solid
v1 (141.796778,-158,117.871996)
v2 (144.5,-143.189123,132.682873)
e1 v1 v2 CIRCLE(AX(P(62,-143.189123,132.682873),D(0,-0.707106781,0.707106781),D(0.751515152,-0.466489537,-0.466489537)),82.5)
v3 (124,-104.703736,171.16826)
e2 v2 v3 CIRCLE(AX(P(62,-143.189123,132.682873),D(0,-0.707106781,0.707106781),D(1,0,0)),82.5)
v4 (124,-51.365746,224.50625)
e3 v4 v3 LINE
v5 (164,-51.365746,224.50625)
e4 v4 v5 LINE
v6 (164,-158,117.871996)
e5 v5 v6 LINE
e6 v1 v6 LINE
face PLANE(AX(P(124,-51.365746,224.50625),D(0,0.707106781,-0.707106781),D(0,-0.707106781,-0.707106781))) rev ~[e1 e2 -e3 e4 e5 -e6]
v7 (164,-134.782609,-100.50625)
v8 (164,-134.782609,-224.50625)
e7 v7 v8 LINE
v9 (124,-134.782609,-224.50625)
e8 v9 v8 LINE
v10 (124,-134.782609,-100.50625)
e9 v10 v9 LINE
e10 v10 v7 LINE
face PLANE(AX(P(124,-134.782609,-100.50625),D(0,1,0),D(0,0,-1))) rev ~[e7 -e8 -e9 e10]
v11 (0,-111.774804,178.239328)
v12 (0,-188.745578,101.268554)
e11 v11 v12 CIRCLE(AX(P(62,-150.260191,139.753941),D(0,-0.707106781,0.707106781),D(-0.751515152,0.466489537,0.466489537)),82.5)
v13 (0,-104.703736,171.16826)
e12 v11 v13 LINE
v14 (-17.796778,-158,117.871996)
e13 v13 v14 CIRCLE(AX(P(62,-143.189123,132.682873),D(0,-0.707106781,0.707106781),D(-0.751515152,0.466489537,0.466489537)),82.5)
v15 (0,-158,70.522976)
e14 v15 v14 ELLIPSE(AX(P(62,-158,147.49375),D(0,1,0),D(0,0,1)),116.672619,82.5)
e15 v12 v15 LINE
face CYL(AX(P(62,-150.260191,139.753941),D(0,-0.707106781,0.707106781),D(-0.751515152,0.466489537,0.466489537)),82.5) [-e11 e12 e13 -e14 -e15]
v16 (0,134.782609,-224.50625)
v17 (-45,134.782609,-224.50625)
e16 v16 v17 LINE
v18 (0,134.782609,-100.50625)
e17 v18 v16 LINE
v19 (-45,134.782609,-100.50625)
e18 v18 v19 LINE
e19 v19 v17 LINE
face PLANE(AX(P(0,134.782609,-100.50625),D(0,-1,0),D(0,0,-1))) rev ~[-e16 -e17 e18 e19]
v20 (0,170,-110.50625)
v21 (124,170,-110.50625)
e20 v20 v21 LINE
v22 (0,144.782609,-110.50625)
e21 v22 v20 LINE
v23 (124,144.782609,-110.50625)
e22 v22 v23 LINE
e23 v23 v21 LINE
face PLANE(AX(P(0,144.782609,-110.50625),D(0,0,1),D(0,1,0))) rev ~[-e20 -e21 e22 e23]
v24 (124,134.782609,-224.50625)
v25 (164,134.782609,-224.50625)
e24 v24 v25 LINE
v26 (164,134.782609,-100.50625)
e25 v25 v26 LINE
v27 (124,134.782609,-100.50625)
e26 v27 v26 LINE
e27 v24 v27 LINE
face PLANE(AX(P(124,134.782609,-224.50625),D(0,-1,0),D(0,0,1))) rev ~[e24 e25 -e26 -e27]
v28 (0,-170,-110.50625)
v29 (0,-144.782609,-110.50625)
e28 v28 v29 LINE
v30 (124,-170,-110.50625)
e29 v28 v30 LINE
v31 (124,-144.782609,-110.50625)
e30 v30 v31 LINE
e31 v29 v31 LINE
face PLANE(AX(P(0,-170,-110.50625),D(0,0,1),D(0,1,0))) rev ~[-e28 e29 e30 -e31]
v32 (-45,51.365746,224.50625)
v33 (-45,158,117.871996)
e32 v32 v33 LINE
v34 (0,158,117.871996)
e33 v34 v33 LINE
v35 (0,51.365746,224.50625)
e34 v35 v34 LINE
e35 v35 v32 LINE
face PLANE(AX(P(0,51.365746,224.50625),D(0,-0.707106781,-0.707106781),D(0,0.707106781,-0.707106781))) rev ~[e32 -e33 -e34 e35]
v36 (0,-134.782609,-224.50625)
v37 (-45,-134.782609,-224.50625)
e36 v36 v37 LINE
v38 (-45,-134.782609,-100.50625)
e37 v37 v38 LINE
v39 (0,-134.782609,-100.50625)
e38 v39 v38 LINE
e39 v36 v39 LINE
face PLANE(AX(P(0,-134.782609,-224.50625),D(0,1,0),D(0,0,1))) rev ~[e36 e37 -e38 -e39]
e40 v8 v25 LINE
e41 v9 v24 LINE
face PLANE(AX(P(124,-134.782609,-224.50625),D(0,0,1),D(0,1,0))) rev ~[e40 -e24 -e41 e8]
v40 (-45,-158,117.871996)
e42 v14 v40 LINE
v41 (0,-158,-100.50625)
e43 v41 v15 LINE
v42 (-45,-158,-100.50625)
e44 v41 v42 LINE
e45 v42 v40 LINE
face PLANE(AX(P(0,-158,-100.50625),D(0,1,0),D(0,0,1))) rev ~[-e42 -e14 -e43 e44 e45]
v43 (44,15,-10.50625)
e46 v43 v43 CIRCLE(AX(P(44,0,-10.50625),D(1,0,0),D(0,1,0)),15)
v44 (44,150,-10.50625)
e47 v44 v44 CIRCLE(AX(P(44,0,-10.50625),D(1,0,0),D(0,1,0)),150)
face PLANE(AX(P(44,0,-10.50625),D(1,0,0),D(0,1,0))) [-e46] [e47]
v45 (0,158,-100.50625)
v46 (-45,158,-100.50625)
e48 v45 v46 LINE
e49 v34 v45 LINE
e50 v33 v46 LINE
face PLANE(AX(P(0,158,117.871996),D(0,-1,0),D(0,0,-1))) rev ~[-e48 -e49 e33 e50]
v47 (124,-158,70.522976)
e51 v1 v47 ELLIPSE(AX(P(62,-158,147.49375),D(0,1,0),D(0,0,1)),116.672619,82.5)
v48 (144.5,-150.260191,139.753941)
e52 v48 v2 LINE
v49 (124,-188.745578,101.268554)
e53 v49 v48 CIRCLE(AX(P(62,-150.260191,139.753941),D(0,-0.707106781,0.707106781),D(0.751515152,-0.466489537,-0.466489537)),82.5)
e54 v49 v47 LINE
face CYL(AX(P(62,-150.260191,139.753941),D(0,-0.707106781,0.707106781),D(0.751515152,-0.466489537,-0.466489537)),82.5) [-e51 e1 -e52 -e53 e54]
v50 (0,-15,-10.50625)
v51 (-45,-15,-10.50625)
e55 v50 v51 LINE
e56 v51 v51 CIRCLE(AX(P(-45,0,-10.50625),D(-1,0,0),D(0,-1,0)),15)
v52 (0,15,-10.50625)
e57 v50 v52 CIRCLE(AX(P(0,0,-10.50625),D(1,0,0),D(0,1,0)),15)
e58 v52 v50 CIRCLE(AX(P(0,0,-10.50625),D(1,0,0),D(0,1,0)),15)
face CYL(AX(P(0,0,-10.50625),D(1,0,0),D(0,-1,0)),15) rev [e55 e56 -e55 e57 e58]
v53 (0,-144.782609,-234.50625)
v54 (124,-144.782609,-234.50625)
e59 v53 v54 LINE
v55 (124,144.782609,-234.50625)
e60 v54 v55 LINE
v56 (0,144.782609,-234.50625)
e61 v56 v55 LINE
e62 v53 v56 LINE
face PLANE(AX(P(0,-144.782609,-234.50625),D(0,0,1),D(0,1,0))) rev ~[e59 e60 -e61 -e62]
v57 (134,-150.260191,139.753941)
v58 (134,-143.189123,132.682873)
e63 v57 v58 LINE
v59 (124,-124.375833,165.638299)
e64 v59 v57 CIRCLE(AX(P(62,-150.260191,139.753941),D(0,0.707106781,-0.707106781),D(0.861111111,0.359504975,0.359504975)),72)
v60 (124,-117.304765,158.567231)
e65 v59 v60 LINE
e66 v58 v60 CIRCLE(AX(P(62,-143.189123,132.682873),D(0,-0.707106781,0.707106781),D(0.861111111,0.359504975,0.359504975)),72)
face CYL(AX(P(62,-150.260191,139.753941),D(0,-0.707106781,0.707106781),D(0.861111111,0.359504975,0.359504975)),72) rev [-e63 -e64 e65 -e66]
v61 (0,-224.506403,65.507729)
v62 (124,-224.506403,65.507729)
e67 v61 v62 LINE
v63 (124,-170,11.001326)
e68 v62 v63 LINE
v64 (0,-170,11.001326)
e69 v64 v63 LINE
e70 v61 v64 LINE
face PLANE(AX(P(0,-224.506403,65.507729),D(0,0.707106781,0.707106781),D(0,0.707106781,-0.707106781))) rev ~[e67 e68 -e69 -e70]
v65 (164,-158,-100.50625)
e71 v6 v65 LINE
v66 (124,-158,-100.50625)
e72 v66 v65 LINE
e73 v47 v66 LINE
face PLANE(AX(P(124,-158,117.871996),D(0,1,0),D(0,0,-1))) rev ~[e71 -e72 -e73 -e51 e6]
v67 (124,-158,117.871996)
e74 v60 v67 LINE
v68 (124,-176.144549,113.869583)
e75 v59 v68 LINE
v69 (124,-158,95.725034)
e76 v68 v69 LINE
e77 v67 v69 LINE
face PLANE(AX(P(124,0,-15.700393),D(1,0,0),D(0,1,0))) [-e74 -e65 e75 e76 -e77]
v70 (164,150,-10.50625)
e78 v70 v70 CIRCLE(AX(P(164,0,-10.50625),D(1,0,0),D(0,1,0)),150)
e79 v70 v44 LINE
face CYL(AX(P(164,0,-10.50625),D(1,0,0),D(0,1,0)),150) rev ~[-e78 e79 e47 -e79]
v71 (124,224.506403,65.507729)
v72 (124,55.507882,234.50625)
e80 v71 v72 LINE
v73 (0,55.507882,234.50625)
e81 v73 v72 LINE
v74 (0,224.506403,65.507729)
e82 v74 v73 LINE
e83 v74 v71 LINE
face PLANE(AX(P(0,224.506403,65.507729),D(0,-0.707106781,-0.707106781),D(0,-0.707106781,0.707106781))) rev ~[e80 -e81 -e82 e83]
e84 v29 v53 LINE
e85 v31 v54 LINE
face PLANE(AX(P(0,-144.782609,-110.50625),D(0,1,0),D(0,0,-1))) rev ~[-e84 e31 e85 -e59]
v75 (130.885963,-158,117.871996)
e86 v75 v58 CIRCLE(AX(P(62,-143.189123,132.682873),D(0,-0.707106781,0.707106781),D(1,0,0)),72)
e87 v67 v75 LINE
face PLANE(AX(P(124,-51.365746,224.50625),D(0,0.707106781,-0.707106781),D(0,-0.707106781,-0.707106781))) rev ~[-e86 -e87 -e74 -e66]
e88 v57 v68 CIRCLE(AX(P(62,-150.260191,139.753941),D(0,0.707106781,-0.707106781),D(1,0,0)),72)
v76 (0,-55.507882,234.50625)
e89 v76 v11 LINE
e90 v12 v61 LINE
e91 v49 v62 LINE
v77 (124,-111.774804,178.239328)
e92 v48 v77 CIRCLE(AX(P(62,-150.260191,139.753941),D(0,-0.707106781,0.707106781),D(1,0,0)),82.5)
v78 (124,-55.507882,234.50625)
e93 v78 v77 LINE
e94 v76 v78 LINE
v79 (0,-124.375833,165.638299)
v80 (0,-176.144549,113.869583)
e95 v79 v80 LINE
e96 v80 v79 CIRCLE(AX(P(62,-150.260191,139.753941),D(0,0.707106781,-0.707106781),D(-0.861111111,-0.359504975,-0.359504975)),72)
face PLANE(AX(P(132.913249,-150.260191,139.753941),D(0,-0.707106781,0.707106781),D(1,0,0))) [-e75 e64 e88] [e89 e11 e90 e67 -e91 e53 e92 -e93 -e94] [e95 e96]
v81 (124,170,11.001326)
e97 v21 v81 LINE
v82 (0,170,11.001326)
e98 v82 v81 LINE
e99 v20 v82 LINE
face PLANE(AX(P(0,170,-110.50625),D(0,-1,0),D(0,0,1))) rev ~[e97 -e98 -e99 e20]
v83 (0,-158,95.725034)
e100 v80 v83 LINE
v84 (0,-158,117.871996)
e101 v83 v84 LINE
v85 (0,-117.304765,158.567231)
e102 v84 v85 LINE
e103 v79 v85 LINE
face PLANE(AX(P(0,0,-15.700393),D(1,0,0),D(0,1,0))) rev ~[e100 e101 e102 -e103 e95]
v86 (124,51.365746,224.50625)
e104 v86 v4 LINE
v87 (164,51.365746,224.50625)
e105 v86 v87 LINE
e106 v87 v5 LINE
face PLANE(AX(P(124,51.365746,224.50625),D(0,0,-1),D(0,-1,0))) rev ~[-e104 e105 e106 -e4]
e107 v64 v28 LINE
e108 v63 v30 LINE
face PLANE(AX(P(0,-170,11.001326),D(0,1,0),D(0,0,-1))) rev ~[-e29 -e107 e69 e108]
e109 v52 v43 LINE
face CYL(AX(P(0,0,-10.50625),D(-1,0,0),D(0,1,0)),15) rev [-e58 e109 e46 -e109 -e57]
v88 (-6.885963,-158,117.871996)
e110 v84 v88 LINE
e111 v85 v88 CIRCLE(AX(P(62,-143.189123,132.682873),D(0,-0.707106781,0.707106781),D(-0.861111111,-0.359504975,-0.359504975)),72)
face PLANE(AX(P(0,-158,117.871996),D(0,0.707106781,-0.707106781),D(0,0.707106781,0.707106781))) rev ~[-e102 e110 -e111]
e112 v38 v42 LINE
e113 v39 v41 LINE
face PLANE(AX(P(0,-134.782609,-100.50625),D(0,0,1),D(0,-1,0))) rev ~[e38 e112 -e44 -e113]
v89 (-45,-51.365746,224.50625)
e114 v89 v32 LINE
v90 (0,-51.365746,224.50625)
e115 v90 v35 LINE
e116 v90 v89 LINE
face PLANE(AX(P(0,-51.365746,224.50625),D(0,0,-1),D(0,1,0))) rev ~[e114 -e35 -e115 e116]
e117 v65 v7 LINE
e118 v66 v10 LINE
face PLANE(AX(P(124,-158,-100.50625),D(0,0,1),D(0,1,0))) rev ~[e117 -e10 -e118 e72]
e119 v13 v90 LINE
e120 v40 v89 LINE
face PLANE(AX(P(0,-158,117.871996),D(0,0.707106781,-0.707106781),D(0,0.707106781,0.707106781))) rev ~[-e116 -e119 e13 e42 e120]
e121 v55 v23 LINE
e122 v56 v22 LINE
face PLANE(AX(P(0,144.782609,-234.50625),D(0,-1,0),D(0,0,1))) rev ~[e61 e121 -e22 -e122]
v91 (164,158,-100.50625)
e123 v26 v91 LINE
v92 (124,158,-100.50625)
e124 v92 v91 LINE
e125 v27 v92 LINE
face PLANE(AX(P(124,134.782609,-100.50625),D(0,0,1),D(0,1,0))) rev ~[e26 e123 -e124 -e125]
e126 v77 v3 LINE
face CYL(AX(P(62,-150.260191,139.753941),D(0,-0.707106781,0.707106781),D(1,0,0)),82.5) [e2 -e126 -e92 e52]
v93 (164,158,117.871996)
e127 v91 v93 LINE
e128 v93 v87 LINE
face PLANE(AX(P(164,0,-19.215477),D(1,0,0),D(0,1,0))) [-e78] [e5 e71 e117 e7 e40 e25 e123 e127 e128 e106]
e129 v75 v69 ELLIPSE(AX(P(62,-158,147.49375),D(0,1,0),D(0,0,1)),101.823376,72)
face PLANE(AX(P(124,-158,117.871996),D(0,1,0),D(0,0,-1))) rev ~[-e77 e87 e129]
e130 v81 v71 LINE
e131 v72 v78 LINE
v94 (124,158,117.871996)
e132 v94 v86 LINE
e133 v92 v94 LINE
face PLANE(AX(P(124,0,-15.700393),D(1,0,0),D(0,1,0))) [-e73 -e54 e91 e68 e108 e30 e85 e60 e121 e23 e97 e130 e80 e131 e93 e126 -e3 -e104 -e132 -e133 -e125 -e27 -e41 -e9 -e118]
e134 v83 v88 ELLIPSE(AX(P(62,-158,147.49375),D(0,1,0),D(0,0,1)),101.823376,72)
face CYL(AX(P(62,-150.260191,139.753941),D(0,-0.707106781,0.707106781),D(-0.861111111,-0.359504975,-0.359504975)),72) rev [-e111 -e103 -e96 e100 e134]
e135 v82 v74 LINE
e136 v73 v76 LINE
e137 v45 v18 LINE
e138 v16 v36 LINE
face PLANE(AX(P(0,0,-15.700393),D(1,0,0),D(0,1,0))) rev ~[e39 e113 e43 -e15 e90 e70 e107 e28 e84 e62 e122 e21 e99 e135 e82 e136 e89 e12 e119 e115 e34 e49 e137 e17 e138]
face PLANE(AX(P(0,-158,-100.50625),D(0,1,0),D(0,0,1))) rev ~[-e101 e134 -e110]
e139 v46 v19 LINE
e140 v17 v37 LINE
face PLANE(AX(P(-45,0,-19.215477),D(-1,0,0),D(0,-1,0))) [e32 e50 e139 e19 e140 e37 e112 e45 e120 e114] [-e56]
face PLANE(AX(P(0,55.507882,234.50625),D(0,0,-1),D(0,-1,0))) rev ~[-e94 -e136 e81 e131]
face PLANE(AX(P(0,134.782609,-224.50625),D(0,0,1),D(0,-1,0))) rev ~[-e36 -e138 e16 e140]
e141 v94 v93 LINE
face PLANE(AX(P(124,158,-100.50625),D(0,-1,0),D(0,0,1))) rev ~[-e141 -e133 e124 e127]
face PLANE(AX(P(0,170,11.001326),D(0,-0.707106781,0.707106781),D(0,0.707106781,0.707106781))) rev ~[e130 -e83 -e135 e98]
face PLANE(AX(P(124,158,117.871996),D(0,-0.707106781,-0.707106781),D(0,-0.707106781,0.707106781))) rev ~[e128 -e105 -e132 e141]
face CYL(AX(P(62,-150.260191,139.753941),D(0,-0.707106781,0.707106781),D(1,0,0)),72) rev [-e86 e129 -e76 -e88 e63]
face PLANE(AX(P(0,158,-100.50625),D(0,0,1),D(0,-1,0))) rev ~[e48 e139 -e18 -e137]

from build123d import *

# Parameters (mm, degrees)
F0_R     = 15
F1_DEPTH = 124
F3_DEPTH = 40
F4_R     = 15
F5_DEPTH = 45
F7_DEPTH = 100
F8_R     = 150
F8_R_2   = 15
F9_DEPTH = 120


with BuildPart() as f1:
    # F0 (on Right) → F1 (new body)
    with BuildSketch(Plane.YZ):
        Polygon((-55.507882, 234.50625), (-150.260191, 139.753941), (-224.506403, 65.507729), (-170, 11.001326), (-170, -110.50625), (-144.782609, -110.50625), (-144.782609, -234.50625), (144.782609, -234.50625), (144.782609, -110.50625), (170, -110.50625), (170, 11.001326), (224.506403, 65.507729), (150.260191, 139.753941), (55.507882, 234.50625), align=None)
        with Locations((0, -10.50625)):
            Circle(F0_R, mode=Mode.SUBTRACT)
    extrude(amount=F1_DEPTH)

    # F2 (on face) → F3 (join)
    with BuildSketch(Plane.YZ.offset(124)):
        Polygon((0, 224.50625), (-51.3657463763, 224.50625), (-158, 117.8719963763), (-158, -100.50625), (-134.782609, -100.50625), (-134.782609, -224.50625), (0, -224.50625), (134.782609, -224.50625), (134.782609, -100.50625), (158, -100.50625), (158, 117.8719963763), (51.3657463763, 224.50625), align=None)
        with BuildLine():
            ThreePointArc((15, -10.50625), (-10.6066017178, -21.1128517178), (0, 4.49375))
            ThreePointArc((0, 4.49375), (10.6066017178, 0.1003517178), (15, -10.50625))
        make_face(mode=Mode.SUBTRACT)
    extrude(amount=F3_DEPTH)

    # F4 (on face) → F5 (join)
    with BuildSketch(Plane(origin=(0, 0, 0), x_dir=(0, -1, 0), z_dir=(-1, 0, 0))):
        Polygon((134.782609, -100.50625), (158, -100.50625), (158, 117.8719963763), (51.3657463763, 224.50625), (0, 224.50625), (-51.3657463763, 224.50625), (-158, 117.8719963763), (-158, -100.50625), (-134.782609, -100.50625), (-134.782609, -224.50625), (0, -224.50625), (134.782609, -224.50625), align=None)
        with Locations((0, -10.50625)):
            Circle(F4_R, mode=Mode.SUBTRACT)
    extrude(amount=F5_DEPTH)

    # F6 (on face) → F7 (join)
    with BuildSketch(Plane(origin=(0, -145.007066, 145.007066), x_dir=(1, 0, 0), z_dir=(0, -0.7071067812, 0.7071067812))):
        with BuildLine():
            ThreePointArc((124, -61.8555966032), (139.2050840295, -36.5086726323), (144.5, -7.4290405851))
            ThreePointArc((144.5, -7.4290405851), (139.2050840295, 21.6505914621), (124, 46.9975154331))
            Line((124, 46.9975154331), (124, 29.1769698504))
            ThreePointArc((124, 29.1769698504), (131.4550214167, 11.5446253759), (134, -7.4290405851))
            ThreePointArc((134, -7.4290405851), (131.4550214167, -26.4027065461), (124, -44.0350510205))
            Line((124, -44.0350510205), (124, -61.8555966032))
        make_face()
        with BuildLine():
            ThreePointArc((0, -61.8555966032), (62, -89.9290405851), (124, -61.8555966032))
            Line((124, -61.8555966032), (124, -44.0350510205))
            ThreePointArc((124, -44.0350510205), (62, -79.4290405851), (0, -44.0350510205))
            Line((0, -44.0350510205), (0, -61.8555966033))
        make_face()
        with BuildLine():
            Line((0, 29.1769698504), (0, 46.9975154331))
            ThreePointArc((0, 46.9975154331), (-20.5, -7.4290405851), (0, -61.8555966032))
            Line((0, -61.8555966033), (0, -44.0350510205))
            ThreePointArc((0, -44.0350510205), (-10, -7.4290405851), (0, 29.1769698504))
        make_face()
    extrude(amount=-F7_DEPTH)

    # F8 (on face) → F9 (cut)
    with BuildSketch(Plane.YZ.offset(164)):
        with Locations((0, -10.50625)):
            Circle(F8_R)
        with Locations((0, -10.50625)):
            Circle(F8_R_2, mode=Mode.SUBTRACT)
    extrude(amount=-F9_DEPTH, mode=Mode.SUBTRACT)


solid = f1.part
